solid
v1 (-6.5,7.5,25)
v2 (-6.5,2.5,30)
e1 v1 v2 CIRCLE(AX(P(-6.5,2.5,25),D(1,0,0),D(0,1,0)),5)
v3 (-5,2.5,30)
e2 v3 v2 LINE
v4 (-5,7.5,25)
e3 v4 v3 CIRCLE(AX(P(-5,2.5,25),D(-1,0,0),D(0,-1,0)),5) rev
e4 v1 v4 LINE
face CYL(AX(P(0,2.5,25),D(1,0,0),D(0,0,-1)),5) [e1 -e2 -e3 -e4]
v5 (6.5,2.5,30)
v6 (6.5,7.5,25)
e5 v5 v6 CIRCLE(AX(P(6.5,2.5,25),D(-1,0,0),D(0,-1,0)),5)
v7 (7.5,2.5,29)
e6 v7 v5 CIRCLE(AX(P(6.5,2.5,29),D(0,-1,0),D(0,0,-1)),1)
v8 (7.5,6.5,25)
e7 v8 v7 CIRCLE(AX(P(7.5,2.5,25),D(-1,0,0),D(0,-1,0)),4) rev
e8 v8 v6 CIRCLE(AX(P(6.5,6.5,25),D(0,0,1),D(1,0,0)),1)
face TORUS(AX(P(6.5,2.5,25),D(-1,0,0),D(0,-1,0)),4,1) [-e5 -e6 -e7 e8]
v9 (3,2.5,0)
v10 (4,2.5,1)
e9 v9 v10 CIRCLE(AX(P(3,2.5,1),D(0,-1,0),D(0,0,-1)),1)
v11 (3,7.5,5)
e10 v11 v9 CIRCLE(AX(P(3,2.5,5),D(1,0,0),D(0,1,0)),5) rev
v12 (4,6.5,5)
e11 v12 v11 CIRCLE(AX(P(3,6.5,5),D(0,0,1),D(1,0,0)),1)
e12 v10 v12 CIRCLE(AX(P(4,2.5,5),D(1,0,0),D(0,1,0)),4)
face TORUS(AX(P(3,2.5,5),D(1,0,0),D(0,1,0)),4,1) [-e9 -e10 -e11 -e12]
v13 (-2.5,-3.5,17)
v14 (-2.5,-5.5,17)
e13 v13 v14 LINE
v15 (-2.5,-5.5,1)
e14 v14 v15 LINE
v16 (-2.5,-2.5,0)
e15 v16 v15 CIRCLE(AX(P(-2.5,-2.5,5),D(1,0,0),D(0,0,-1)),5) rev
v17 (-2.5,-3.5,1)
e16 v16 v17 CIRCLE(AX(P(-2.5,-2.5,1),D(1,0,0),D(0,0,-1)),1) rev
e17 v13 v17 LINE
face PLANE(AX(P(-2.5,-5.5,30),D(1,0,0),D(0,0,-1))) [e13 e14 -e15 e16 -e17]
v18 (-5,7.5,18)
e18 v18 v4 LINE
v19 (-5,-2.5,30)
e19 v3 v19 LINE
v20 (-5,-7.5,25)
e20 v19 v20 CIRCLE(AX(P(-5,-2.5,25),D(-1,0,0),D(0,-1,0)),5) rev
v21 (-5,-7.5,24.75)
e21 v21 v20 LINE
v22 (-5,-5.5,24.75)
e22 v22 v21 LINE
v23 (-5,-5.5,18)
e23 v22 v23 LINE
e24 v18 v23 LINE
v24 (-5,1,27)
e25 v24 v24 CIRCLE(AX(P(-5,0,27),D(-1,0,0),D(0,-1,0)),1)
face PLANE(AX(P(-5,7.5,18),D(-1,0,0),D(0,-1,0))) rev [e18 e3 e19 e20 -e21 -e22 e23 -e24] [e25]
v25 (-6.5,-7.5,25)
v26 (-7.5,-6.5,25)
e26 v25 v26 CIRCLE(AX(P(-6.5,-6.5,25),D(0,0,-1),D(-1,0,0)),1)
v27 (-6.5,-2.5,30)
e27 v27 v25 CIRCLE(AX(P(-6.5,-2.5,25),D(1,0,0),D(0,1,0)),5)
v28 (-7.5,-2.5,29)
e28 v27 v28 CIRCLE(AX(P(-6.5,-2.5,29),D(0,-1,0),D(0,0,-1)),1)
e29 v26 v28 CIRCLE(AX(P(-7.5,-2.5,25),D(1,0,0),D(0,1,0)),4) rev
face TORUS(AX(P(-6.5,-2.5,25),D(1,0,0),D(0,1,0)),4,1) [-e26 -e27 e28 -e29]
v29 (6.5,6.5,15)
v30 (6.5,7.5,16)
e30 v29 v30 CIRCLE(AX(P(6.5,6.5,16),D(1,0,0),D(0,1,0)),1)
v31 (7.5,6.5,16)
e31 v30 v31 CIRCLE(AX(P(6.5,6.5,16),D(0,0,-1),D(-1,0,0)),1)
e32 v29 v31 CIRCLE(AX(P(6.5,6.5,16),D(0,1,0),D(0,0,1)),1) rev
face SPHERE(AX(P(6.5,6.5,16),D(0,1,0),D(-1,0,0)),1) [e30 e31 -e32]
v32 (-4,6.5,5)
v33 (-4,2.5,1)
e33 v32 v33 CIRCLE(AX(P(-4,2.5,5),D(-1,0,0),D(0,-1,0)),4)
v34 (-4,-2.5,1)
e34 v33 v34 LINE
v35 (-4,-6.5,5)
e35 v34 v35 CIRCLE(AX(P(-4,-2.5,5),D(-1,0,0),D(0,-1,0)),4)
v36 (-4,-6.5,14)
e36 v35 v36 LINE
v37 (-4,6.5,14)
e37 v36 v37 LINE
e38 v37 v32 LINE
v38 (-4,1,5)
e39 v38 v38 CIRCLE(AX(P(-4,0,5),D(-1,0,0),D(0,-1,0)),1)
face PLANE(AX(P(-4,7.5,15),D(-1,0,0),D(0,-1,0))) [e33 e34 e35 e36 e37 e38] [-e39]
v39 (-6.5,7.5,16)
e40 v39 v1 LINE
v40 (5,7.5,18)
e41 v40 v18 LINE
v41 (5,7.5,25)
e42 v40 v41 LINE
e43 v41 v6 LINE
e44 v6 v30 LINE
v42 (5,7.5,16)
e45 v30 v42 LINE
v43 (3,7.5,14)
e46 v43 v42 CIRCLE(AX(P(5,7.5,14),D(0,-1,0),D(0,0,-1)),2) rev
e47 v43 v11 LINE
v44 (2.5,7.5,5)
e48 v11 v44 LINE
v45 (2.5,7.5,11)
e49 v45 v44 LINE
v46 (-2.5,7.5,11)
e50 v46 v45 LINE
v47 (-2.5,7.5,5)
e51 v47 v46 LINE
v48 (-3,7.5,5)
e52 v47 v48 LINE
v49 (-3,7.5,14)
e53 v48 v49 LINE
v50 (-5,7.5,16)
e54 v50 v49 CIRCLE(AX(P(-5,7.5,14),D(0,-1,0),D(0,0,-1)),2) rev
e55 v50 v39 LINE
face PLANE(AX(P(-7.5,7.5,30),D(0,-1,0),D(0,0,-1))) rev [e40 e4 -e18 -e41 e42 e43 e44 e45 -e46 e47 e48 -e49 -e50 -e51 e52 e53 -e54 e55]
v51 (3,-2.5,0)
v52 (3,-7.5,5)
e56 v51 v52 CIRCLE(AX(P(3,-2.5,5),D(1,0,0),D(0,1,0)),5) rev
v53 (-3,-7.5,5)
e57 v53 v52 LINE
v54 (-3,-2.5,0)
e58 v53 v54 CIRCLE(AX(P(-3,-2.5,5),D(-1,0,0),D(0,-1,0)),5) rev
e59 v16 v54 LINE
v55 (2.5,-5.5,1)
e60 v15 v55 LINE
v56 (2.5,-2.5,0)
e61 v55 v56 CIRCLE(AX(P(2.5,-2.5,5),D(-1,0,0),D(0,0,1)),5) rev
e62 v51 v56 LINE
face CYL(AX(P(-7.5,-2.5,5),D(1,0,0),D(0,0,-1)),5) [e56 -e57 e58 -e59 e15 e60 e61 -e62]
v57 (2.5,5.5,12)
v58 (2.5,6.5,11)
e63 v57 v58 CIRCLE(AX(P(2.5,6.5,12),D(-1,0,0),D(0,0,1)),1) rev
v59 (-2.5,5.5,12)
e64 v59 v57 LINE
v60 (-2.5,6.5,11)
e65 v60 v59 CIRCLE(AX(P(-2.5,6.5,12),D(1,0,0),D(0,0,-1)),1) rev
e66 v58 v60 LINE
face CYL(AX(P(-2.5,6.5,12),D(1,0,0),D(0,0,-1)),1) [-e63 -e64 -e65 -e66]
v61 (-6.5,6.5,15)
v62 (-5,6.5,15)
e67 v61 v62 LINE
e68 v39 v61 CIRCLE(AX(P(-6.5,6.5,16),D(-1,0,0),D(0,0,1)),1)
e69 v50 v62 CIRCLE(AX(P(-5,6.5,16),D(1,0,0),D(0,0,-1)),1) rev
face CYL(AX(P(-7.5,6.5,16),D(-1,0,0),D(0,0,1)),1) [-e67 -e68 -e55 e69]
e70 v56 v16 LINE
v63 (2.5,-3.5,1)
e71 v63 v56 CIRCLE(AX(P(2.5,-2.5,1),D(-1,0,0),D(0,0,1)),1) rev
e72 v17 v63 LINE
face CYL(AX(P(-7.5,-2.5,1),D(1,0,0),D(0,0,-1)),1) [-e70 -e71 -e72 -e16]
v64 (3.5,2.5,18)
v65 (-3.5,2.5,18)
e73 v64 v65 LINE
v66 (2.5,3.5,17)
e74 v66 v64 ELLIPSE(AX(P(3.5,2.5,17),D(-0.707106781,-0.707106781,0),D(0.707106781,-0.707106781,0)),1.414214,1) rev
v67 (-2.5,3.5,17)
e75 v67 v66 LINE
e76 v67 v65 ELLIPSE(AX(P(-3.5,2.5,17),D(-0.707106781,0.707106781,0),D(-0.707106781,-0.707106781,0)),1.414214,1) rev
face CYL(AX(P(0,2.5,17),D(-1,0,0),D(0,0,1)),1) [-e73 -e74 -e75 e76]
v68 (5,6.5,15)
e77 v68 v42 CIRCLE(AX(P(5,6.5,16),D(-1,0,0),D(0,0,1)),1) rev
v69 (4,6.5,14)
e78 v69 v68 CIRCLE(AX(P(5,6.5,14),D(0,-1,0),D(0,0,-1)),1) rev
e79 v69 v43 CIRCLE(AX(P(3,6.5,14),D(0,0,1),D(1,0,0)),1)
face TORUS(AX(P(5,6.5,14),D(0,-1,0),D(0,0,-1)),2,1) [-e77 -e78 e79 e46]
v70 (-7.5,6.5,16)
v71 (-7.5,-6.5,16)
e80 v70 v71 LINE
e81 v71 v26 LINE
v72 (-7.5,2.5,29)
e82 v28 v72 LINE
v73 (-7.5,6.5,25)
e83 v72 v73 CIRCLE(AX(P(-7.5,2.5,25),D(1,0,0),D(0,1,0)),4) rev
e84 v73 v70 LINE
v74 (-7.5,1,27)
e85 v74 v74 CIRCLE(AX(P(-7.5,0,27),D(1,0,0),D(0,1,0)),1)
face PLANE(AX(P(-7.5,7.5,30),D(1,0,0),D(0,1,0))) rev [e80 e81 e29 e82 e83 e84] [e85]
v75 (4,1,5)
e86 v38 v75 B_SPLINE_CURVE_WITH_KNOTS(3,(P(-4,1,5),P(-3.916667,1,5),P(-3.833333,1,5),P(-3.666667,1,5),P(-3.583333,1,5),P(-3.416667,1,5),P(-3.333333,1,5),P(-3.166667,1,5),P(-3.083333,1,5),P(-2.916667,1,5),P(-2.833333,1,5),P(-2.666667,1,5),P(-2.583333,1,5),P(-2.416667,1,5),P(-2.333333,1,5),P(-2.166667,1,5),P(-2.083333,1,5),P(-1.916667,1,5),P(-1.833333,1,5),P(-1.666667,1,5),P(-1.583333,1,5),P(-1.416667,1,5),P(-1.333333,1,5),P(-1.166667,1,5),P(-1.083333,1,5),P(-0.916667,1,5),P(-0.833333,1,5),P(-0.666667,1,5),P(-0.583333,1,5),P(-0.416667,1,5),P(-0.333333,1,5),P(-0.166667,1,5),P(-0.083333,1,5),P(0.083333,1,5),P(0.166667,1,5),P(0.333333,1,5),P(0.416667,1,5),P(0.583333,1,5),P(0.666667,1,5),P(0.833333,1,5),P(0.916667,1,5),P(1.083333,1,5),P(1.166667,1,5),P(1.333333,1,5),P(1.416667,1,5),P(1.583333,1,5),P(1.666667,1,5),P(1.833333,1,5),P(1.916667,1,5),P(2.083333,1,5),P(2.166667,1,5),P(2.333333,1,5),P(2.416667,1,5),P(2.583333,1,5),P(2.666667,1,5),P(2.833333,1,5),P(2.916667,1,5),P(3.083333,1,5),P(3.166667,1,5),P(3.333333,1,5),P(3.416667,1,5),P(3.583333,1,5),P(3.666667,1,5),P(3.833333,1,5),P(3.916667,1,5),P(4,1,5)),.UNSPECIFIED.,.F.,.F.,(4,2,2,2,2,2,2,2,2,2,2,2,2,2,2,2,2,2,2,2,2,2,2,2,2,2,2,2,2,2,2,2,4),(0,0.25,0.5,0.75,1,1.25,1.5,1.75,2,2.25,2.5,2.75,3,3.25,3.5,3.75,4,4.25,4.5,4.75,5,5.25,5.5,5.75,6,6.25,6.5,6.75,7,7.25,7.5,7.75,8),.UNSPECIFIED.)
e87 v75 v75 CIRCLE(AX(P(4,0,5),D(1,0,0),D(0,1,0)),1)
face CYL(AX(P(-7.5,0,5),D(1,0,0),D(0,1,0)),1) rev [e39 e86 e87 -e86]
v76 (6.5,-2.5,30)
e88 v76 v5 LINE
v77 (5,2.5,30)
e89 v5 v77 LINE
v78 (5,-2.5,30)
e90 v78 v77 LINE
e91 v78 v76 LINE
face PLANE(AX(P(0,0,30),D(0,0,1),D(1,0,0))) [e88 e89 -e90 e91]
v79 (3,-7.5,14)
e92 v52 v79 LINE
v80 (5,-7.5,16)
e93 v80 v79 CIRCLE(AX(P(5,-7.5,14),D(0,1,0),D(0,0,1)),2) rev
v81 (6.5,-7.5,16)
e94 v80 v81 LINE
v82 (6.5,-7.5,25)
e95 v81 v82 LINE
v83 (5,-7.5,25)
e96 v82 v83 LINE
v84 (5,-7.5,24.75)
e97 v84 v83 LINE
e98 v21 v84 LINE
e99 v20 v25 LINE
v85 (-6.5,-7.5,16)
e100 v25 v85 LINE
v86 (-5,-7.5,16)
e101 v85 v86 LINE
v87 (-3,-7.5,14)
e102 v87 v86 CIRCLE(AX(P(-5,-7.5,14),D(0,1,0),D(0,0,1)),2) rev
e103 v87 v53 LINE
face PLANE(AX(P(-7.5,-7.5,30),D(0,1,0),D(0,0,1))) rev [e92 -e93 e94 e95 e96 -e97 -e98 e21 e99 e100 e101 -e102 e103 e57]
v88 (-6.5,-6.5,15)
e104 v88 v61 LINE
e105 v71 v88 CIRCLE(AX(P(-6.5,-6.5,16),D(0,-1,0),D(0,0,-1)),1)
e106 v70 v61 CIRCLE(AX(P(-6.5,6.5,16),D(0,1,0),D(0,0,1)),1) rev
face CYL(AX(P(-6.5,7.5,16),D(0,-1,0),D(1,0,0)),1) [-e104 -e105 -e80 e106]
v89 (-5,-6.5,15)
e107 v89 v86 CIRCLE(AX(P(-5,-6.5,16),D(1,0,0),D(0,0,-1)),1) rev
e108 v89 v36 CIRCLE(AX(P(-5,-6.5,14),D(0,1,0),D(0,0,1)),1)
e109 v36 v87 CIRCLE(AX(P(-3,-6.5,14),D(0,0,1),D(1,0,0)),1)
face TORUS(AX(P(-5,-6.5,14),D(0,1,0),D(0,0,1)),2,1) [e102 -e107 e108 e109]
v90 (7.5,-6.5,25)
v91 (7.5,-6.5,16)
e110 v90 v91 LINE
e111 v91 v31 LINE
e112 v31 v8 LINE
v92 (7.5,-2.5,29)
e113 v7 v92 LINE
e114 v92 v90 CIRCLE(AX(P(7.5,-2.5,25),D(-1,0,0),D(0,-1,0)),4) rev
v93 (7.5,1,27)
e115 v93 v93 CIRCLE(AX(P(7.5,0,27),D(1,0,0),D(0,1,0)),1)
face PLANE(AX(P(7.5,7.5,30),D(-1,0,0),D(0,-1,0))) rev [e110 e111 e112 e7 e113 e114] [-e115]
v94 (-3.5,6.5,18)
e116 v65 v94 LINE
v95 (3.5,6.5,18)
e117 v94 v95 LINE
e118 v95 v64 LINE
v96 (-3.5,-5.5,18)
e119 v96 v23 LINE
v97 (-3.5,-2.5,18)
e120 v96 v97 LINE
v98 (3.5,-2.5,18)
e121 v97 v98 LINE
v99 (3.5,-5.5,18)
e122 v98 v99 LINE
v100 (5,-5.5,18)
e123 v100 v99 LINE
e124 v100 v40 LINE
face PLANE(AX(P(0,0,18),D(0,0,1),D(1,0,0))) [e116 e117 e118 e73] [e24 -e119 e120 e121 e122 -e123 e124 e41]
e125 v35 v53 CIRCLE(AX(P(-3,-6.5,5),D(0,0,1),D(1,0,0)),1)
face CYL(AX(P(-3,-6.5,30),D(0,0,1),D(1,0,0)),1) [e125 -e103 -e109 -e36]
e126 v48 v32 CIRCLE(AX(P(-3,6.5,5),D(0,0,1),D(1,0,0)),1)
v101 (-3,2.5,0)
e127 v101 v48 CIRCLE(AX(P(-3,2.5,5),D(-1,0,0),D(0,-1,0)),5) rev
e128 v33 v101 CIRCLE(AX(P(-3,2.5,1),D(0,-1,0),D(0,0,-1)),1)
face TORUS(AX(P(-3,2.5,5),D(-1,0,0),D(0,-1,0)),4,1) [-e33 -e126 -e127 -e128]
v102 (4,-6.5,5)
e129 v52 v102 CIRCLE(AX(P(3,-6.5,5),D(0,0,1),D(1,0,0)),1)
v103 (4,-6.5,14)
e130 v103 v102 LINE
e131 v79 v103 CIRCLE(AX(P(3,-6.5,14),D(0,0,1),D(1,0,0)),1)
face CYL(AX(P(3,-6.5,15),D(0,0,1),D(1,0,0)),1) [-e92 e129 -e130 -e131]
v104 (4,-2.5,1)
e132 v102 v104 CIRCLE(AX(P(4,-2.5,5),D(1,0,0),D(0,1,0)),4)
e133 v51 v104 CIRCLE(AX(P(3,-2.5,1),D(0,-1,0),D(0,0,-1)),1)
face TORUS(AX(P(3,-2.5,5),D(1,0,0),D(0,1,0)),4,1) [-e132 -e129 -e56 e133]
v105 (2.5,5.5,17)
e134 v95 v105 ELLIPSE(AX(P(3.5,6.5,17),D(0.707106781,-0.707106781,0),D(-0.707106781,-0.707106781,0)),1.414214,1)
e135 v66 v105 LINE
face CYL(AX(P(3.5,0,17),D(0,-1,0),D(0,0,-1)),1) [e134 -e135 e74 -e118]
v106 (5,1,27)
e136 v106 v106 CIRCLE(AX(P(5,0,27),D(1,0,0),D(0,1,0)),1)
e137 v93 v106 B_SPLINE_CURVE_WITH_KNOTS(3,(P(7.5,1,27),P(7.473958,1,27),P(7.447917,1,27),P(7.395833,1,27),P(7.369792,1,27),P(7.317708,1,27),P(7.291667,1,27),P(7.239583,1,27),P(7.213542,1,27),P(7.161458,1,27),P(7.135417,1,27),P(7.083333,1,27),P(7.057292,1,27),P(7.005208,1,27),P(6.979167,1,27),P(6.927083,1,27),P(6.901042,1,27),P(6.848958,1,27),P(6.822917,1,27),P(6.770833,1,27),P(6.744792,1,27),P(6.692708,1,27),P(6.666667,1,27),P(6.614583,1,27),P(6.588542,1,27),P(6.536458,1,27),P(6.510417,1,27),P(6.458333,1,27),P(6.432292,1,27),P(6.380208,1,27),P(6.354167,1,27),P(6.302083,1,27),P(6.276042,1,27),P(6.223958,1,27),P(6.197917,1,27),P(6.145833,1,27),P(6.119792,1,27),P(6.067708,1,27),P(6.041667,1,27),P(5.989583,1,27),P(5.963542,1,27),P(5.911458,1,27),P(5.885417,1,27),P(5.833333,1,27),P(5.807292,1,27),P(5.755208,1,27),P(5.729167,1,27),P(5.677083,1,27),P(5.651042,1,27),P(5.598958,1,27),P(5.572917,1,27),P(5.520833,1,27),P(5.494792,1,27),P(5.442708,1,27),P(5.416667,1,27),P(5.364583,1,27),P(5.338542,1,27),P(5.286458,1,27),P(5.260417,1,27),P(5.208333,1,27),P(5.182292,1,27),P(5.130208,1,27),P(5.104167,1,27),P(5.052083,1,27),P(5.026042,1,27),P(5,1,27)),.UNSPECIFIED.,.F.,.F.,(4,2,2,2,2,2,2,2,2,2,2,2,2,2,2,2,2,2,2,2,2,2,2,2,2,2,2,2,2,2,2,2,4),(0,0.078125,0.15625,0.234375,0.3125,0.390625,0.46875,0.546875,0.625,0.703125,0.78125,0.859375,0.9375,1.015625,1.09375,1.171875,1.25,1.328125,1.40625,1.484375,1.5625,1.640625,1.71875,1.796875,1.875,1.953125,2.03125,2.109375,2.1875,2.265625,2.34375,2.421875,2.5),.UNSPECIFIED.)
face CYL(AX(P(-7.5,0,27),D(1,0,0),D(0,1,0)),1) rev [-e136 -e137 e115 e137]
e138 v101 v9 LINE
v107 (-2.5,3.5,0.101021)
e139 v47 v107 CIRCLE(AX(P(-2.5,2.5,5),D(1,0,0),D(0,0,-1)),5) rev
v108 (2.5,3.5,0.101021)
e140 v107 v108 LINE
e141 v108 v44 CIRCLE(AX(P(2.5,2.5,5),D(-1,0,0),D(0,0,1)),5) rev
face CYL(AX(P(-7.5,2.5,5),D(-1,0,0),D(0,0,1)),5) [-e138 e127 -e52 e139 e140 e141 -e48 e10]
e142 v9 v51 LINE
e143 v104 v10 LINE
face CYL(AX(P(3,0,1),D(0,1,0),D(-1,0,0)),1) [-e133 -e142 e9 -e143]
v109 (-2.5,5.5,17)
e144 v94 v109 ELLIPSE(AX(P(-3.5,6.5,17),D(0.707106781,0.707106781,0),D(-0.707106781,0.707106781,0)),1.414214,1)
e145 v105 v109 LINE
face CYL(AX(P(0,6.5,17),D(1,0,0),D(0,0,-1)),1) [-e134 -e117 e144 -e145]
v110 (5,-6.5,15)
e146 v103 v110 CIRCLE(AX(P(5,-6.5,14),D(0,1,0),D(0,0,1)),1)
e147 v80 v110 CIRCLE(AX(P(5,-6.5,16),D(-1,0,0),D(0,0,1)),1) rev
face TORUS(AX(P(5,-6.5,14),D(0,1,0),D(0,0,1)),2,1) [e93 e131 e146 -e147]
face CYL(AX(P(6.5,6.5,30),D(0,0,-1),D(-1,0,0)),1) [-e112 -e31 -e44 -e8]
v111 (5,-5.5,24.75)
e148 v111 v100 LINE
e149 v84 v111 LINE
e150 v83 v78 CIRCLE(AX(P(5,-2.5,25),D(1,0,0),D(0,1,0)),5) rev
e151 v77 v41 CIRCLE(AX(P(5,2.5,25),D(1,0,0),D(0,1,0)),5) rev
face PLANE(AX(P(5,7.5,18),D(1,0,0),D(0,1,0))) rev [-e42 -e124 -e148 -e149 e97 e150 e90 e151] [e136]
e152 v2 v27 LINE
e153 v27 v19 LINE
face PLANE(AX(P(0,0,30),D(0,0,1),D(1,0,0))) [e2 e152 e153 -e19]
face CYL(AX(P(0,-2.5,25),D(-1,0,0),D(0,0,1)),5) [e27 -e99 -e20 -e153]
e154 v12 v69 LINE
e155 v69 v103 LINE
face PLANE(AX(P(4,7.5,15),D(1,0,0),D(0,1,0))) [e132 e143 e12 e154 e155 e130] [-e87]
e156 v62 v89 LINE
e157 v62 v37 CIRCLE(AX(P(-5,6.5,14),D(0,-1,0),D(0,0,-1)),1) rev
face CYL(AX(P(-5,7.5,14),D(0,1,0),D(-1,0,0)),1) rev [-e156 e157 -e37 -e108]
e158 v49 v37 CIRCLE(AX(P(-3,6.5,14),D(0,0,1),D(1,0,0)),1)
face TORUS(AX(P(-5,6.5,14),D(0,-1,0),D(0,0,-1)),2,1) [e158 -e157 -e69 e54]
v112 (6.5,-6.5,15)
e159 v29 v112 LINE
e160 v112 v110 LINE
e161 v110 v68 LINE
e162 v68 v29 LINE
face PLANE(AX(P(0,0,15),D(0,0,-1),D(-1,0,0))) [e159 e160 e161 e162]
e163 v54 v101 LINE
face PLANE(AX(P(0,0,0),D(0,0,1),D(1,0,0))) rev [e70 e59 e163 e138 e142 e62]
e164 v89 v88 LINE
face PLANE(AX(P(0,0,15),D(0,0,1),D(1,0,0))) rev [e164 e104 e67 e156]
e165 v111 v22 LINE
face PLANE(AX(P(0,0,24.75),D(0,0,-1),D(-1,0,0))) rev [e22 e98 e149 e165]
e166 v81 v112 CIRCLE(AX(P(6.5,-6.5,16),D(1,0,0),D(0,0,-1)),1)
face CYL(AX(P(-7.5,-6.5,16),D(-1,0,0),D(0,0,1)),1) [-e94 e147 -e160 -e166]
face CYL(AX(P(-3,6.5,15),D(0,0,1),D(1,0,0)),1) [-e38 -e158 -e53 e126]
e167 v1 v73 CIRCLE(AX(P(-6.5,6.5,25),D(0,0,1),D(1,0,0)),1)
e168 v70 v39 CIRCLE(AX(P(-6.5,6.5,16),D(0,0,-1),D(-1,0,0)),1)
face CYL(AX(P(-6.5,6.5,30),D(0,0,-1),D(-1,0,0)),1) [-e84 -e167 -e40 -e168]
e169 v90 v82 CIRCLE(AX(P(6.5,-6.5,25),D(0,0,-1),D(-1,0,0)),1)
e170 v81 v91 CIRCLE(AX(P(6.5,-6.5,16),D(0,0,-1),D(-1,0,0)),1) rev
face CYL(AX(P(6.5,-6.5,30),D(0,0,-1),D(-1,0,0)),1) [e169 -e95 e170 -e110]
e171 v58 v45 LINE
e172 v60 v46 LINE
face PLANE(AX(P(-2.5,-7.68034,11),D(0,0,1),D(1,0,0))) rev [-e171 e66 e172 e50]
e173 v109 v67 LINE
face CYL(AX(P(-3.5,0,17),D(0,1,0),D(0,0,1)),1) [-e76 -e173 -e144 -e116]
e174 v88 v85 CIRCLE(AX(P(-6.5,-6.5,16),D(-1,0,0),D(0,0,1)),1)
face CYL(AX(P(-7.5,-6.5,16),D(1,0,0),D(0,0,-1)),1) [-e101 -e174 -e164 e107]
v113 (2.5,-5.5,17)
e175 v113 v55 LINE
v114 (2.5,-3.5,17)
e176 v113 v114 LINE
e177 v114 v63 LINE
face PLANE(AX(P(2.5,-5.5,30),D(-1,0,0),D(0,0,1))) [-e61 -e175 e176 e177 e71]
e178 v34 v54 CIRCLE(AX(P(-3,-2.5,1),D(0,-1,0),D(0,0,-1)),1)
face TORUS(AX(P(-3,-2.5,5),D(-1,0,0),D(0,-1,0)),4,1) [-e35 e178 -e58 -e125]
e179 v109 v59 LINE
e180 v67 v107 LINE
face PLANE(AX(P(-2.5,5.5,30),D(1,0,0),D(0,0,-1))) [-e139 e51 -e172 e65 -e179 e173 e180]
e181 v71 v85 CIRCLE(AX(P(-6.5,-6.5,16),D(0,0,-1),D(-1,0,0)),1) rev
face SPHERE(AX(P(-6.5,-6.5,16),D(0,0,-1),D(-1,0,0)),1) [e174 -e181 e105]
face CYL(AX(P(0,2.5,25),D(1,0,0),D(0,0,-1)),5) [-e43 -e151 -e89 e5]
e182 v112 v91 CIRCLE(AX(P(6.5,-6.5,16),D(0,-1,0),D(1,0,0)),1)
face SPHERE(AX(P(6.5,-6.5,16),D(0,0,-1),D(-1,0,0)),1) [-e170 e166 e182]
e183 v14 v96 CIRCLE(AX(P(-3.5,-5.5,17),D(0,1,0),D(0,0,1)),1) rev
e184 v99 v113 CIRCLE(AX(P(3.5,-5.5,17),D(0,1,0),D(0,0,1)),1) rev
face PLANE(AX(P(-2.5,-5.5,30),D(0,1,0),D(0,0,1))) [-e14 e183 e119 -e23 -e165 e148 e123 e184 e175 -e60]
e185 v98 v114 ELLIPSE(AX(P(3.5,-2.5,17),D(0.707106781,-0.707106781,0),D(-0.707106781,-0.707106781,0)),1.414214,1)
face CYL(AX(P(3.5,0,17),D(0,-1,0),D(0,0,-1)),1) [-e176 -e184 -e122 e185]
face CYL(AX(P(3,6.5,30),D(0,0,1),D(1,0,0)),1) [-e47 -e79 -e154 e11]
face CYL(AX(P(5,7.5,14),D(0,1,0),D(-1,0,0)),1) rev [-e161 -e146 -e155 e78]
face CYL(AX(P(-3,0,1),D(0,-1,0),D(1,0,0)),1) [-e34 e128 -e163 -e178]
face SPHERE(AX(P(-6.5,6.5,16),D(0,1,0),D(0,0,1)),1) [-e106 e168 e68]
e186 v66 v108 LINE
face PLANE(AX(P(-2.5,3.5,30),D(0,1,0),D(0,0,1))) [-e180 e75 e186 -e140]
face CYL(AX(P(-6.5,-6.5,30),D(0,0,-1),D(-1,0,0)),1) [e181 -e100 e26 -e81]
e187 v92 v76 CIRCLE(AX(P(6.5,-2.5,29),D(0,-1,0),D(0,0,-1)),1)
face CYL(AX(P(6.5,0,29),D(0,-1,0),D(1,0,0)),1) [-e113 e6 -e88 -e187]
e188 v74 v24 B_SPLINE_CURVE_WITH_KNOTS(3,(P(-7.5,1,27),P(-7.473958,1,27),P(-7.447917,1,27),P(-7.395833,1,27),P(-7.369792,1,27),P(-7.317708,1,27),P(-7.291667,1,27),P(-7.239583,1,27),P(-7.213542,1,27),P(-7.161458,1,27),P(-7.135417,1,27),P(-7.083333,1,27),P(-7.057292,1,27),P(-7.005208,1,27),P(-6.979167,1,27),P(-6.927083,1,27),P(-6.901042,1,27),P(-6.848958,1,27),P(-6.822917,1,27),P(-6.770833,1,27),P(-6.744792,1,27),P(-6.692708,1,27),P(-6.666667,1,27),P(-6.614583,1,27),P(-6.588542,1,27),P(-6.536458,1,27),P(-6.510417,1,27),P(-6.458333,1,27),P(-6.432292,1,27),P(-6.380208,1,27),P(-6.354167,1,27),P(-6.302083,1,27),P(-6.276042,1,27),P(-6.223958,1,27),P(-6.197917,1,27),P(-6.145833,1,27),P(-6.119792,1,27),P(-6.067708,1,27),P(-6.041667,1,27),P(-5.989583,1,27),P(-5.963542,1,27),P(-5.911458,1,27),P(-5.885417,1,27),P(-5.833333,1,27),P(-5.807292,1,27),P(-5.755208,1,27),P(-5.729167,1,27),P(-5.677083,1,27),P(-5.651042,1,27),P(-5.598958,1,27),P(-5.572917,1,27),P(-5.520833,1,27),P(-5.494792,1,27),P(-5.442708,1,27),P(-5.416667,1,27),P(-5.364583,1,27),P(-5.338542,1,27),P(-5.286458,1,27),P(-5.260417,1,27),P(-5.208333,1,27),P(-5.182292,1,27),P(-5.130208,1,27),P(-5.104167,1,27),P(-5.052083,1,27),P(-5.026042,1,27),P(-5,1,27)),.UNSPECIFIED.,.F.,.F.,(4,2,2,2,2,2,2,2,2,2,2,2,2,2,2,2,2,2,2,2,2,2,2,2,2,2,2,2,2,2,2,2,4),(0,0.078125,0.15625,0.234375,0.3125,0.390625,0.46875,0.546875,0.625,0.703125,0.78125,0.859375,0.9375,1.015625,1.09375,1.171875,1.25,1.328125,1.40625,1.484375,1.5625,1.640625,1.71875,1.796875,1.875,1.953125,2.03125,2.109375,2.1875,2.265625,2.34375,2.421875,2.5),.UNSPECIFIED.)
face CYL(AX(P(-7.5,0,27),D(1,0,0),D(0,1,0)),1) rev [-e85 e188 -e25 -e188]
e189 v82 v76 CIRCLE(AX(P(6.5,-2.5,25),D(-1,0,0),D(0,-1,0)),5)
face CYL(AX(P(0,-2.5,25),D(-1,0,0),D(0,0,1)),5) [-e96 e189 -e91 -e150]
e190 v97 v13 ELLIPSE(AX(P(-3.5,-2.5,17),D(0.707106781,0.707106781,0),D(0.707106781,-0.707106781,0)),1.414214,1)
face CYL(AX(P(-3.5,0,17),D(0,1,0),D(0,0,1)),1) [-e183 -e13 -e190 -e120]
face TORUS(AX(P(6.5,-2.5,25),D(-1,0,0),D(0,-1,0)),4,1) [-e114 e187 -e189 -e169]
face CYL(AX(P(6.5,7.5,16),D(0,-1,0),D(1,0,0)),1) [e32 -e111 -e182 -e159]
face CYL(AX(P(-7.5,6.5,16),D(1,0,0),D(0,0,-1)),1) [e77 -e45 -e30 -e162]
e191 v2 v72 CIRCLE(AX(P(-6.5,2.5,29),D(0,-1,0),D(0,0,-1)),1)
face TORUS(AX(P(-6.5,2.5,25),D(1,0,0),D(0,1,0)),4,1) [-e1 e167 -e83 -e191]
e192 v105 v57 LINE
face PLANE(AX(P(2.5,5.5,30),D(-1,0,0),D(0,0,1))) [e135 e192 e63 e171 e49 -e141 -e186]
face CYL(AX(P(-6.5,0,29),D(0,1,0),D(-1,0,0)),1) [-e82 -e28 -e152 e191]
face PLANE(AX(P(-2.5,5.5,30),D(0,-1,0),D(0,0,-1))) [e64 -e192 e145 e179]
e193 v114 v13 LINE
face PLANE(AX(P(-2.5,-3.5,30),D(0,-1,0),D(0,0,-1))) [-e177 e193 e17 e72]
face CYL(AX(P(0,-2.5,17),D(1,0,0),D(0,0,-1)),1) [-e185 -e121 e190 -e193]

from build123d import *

# Parameters (mm, degrees)
BASE_SKETCH_W                    = 15
BASE_SKETCH_H                    = 15
BASE_SKETCH_EXTRUDE_DEPTH        = 30
CENTER_NUB_CUTOUT_SKETCH_W       = 3.5
CENTER_NUB_CUTOUT_SKETCH_H       = 15
HINGE_NUB_EXTRUDED_CUT_DEPTH     = 15
HINGE_CUTOUT_SKETCH_W            = 10
HINGE_CUTOUT_SKETCH_H            = 15
HINGE_CUTOUT_EXTRUDED_CUT_DEPTH  = 12
HINGE_HOLE_SKETCH_R              = 1
HINGE_HOLE_EXTRUDED_CUT_DEPTH    = 35.369317712
CORNER_FILLETS_R                 = 5
STYLE_FILLETS_R                  = 1
ROUTING_HOLES_SKETCH_W           = 5
ROUTING_HOLES_SKETCH_H           = 2
ROUTING_HOLES_EXTRUDED_CUT_DEPTH = 32.819805153
SKETCH1_W                        = 10
SKETCH1_H                        = 2
BACKING_EXTRUDE_DEPTH            = 6.75
EXTRA_ROUTING_CUT_SKETCH_W       = 5
EXTRA_ROUTING_CUT_SKETCH_H       = 10
EXTRA_ROUTING_EXTRUDED_CUT_DEPTH = 4
ROUTING_FILLETS_R                = 1


with BuildPart() as part:
    # Base Sketch → Base Sketch Extrude (new body)
    with BuildSketch(Plane.XY):
        Rectangle(BASE_SKETCH_W, BASE_SKETCH_H)
    extrude(amount=BASE_SKETCH_EXTRUDE_DEPTH)

    # Center Nub Cutout Sketch → Hinge Nub Extruded Cut (cut)
    with BuildSketch(Plane.XY):
        with Locations((5.75, 0)):
            Rectangle(CENTER_NUB_CUTOUT_SKETCH_W, CENTER_NUB_CUTOUT_SKETCH_H)
        with Locations((-5.75, 0)):
            Rectangle(CENTER_NUB_CUTOUT_SKETCH_W, CENTER_NUB_CUTOUT_SKETCH_H)
    extrude(amount=HINGE_NUB_EXTRUDED_CUT_DEPTH, mode=Mode.SUBTRACT)

    # Hinge Cutout Sketch → Hinge Cutout Extruded Cut (cut)
    with BuildSketch(Plane.XY.offset(30)):
        Rectangle(HINGE_CUTOUT_SKETCH_W, HINGE_CUTOUT_SKETCH_H)
    extrude(amount=-HINGE_CUTOUT_EXTRUDED_CUT_DEPTH, mode=Mode.SUBTRACT)

    # Hinge Hole Sketch → Hinge Hole Extruded Cut (cut, through all)
    with BuildSketch(Plane(origin=(7.5, 0, 0), x_dir=(0, 0, -1), z_dir=(1, 0, 0))):
        with Locations(Location((-5, 0, 0), (0, 0, 90))):
            Circle(HINGE_HOLE_SKETCH_R)
        with Locations(Location((-27, 0, 0), (0, 0, 90))):
            Circle(HINGE_HOLE_SKETCH_R)
    extrude(amount=-HINGE_HOLE_EXTRUDED_CUT_DEPTH, mode=Mode.SUBTRACT)

    # Corner Fillets
    corner_fillets_edges = [part.edges().sort_by_distance(p)[0] for p in [
        (0, -7.5, 0),
        (0, 7.5, 0),
        (-6.25, -7.5, 30),
        (-6.25, 7.5, 30),
        (6.25, -7.5, 30),
        (6.25, 7.5, 30),
    ]]
    fillet(corner_fillets_edges, radius=CORNER_FILLETS_R)

    # Style Fillets
    style_fillets_edges = [part.edges().sort_by_distance(p)[0] for p in [
        (4, 7.5, 10),
        (4, -7.5, 10),
        (7.5, 0, 15),
        (5.75, 7.5, 15),
        (4, 0, 15),
        (5.75, -7.5, 15),
        (-4, -7.5, 10),
        (-4, 7.5, 10),
        (-7.5, 0, 15),
        (-5.75, -7.5, 15),
        (-4, 0, 15),
        (-5.75, 7.5, 15),
        (-7.5, 0, 30),
        (-7.5, -7.5, 20),
        (7.5, -7.5, 20),
        (-7.5, 7.5, 20),
        (-7.5, 6.035533906, 28.535533906),
        (-7.5, -6.035533906, 28.535533906),
        (7.5, 7.5, 20),
        (7.5, 0, 30),
        (7.5, 6.035533906, 28.535533906),
        (7.5, -6.035533906, 28.535533906),
        (4, 0, 0),
        (4, 6.035533906, 1.464466094),
        (4, -6.035533906, 1.464466094),
        (-4, 0, 0),
        (-4, 6.035533906, 1.464466094),
        (-4, -6.035533906, 1.464466094),
    ]]
    fillet(style_fillets_edges, radius=STYLE_FILLETS_R)

    # Routing Holes Sketch → Routing Holes Extruded Cut (cut, through all)
    with BuildSketch(Plane.XY):
        with Locations((0, 4.5)):
            Rectangle(ROUTING_HOLES_SKETCH_W, ROUTING_HOLES_SKETCH_H)
        with Locations((0, -4.5)):
            Rectangle(ROUTING_HOLES_SKETCH_W, ROUTING_HOLES_SKETCH_H)
    extrude(amount=ROUTING_HOLES_EXTRUDED_CUT_DEPTH, mode=Mode.SUBTRACT)

    # Sketch1 → Backing Extrude (add)
    with BuildSketch(Plane.XY.offset(18)):
        with Locations((0, -6.5)):
            Rectangle(SKETCH1_W, SKETCH1_H)
    extrude(amount=BACKING_EXTRUDE_DEPTH)

    # Extra Routing Cut Sketch → Extra Routing Extruded Cut (cut)
    with BuildSketch(Plane(origin=(0, 7.5, 0), x_dir=(1, 0, 0), z_dir=(0, 1, 0))):
        with Locations((0, -6)):
            Rectangle(EXTRA_ROUTING_CUT_SKETCH_W, EXTRA_ROUTING_CUT_SKETCH_H)
    extrude(amount=-EXTRA_ROUTING_EXTRUDED_CUT_DEPTH, mode=Mode.SUBTRACT)

    # Routing Fillets
    routing_fillets_edges = [part.edges().sort_by_distance(p)[0] for p in [
        (0, -3.5, 0.101020514),
        (-2.5, 4.5, 18),
        (0, 3.5, 18),
        (2.5, 4.5, 18),
        (0, 5.5, 18),
        (2.5, -4.5, 18),
        (0, -3.5, 18),
        (-2.5, -4.5, 18),
        (0, 5.5, 11),
    ]]
    fillet(routing_fillets_edges, radius=ROUTING_FILLETS_R - 0.0001)  # a hair under: the kernel refuses the full size


solid = part.part
